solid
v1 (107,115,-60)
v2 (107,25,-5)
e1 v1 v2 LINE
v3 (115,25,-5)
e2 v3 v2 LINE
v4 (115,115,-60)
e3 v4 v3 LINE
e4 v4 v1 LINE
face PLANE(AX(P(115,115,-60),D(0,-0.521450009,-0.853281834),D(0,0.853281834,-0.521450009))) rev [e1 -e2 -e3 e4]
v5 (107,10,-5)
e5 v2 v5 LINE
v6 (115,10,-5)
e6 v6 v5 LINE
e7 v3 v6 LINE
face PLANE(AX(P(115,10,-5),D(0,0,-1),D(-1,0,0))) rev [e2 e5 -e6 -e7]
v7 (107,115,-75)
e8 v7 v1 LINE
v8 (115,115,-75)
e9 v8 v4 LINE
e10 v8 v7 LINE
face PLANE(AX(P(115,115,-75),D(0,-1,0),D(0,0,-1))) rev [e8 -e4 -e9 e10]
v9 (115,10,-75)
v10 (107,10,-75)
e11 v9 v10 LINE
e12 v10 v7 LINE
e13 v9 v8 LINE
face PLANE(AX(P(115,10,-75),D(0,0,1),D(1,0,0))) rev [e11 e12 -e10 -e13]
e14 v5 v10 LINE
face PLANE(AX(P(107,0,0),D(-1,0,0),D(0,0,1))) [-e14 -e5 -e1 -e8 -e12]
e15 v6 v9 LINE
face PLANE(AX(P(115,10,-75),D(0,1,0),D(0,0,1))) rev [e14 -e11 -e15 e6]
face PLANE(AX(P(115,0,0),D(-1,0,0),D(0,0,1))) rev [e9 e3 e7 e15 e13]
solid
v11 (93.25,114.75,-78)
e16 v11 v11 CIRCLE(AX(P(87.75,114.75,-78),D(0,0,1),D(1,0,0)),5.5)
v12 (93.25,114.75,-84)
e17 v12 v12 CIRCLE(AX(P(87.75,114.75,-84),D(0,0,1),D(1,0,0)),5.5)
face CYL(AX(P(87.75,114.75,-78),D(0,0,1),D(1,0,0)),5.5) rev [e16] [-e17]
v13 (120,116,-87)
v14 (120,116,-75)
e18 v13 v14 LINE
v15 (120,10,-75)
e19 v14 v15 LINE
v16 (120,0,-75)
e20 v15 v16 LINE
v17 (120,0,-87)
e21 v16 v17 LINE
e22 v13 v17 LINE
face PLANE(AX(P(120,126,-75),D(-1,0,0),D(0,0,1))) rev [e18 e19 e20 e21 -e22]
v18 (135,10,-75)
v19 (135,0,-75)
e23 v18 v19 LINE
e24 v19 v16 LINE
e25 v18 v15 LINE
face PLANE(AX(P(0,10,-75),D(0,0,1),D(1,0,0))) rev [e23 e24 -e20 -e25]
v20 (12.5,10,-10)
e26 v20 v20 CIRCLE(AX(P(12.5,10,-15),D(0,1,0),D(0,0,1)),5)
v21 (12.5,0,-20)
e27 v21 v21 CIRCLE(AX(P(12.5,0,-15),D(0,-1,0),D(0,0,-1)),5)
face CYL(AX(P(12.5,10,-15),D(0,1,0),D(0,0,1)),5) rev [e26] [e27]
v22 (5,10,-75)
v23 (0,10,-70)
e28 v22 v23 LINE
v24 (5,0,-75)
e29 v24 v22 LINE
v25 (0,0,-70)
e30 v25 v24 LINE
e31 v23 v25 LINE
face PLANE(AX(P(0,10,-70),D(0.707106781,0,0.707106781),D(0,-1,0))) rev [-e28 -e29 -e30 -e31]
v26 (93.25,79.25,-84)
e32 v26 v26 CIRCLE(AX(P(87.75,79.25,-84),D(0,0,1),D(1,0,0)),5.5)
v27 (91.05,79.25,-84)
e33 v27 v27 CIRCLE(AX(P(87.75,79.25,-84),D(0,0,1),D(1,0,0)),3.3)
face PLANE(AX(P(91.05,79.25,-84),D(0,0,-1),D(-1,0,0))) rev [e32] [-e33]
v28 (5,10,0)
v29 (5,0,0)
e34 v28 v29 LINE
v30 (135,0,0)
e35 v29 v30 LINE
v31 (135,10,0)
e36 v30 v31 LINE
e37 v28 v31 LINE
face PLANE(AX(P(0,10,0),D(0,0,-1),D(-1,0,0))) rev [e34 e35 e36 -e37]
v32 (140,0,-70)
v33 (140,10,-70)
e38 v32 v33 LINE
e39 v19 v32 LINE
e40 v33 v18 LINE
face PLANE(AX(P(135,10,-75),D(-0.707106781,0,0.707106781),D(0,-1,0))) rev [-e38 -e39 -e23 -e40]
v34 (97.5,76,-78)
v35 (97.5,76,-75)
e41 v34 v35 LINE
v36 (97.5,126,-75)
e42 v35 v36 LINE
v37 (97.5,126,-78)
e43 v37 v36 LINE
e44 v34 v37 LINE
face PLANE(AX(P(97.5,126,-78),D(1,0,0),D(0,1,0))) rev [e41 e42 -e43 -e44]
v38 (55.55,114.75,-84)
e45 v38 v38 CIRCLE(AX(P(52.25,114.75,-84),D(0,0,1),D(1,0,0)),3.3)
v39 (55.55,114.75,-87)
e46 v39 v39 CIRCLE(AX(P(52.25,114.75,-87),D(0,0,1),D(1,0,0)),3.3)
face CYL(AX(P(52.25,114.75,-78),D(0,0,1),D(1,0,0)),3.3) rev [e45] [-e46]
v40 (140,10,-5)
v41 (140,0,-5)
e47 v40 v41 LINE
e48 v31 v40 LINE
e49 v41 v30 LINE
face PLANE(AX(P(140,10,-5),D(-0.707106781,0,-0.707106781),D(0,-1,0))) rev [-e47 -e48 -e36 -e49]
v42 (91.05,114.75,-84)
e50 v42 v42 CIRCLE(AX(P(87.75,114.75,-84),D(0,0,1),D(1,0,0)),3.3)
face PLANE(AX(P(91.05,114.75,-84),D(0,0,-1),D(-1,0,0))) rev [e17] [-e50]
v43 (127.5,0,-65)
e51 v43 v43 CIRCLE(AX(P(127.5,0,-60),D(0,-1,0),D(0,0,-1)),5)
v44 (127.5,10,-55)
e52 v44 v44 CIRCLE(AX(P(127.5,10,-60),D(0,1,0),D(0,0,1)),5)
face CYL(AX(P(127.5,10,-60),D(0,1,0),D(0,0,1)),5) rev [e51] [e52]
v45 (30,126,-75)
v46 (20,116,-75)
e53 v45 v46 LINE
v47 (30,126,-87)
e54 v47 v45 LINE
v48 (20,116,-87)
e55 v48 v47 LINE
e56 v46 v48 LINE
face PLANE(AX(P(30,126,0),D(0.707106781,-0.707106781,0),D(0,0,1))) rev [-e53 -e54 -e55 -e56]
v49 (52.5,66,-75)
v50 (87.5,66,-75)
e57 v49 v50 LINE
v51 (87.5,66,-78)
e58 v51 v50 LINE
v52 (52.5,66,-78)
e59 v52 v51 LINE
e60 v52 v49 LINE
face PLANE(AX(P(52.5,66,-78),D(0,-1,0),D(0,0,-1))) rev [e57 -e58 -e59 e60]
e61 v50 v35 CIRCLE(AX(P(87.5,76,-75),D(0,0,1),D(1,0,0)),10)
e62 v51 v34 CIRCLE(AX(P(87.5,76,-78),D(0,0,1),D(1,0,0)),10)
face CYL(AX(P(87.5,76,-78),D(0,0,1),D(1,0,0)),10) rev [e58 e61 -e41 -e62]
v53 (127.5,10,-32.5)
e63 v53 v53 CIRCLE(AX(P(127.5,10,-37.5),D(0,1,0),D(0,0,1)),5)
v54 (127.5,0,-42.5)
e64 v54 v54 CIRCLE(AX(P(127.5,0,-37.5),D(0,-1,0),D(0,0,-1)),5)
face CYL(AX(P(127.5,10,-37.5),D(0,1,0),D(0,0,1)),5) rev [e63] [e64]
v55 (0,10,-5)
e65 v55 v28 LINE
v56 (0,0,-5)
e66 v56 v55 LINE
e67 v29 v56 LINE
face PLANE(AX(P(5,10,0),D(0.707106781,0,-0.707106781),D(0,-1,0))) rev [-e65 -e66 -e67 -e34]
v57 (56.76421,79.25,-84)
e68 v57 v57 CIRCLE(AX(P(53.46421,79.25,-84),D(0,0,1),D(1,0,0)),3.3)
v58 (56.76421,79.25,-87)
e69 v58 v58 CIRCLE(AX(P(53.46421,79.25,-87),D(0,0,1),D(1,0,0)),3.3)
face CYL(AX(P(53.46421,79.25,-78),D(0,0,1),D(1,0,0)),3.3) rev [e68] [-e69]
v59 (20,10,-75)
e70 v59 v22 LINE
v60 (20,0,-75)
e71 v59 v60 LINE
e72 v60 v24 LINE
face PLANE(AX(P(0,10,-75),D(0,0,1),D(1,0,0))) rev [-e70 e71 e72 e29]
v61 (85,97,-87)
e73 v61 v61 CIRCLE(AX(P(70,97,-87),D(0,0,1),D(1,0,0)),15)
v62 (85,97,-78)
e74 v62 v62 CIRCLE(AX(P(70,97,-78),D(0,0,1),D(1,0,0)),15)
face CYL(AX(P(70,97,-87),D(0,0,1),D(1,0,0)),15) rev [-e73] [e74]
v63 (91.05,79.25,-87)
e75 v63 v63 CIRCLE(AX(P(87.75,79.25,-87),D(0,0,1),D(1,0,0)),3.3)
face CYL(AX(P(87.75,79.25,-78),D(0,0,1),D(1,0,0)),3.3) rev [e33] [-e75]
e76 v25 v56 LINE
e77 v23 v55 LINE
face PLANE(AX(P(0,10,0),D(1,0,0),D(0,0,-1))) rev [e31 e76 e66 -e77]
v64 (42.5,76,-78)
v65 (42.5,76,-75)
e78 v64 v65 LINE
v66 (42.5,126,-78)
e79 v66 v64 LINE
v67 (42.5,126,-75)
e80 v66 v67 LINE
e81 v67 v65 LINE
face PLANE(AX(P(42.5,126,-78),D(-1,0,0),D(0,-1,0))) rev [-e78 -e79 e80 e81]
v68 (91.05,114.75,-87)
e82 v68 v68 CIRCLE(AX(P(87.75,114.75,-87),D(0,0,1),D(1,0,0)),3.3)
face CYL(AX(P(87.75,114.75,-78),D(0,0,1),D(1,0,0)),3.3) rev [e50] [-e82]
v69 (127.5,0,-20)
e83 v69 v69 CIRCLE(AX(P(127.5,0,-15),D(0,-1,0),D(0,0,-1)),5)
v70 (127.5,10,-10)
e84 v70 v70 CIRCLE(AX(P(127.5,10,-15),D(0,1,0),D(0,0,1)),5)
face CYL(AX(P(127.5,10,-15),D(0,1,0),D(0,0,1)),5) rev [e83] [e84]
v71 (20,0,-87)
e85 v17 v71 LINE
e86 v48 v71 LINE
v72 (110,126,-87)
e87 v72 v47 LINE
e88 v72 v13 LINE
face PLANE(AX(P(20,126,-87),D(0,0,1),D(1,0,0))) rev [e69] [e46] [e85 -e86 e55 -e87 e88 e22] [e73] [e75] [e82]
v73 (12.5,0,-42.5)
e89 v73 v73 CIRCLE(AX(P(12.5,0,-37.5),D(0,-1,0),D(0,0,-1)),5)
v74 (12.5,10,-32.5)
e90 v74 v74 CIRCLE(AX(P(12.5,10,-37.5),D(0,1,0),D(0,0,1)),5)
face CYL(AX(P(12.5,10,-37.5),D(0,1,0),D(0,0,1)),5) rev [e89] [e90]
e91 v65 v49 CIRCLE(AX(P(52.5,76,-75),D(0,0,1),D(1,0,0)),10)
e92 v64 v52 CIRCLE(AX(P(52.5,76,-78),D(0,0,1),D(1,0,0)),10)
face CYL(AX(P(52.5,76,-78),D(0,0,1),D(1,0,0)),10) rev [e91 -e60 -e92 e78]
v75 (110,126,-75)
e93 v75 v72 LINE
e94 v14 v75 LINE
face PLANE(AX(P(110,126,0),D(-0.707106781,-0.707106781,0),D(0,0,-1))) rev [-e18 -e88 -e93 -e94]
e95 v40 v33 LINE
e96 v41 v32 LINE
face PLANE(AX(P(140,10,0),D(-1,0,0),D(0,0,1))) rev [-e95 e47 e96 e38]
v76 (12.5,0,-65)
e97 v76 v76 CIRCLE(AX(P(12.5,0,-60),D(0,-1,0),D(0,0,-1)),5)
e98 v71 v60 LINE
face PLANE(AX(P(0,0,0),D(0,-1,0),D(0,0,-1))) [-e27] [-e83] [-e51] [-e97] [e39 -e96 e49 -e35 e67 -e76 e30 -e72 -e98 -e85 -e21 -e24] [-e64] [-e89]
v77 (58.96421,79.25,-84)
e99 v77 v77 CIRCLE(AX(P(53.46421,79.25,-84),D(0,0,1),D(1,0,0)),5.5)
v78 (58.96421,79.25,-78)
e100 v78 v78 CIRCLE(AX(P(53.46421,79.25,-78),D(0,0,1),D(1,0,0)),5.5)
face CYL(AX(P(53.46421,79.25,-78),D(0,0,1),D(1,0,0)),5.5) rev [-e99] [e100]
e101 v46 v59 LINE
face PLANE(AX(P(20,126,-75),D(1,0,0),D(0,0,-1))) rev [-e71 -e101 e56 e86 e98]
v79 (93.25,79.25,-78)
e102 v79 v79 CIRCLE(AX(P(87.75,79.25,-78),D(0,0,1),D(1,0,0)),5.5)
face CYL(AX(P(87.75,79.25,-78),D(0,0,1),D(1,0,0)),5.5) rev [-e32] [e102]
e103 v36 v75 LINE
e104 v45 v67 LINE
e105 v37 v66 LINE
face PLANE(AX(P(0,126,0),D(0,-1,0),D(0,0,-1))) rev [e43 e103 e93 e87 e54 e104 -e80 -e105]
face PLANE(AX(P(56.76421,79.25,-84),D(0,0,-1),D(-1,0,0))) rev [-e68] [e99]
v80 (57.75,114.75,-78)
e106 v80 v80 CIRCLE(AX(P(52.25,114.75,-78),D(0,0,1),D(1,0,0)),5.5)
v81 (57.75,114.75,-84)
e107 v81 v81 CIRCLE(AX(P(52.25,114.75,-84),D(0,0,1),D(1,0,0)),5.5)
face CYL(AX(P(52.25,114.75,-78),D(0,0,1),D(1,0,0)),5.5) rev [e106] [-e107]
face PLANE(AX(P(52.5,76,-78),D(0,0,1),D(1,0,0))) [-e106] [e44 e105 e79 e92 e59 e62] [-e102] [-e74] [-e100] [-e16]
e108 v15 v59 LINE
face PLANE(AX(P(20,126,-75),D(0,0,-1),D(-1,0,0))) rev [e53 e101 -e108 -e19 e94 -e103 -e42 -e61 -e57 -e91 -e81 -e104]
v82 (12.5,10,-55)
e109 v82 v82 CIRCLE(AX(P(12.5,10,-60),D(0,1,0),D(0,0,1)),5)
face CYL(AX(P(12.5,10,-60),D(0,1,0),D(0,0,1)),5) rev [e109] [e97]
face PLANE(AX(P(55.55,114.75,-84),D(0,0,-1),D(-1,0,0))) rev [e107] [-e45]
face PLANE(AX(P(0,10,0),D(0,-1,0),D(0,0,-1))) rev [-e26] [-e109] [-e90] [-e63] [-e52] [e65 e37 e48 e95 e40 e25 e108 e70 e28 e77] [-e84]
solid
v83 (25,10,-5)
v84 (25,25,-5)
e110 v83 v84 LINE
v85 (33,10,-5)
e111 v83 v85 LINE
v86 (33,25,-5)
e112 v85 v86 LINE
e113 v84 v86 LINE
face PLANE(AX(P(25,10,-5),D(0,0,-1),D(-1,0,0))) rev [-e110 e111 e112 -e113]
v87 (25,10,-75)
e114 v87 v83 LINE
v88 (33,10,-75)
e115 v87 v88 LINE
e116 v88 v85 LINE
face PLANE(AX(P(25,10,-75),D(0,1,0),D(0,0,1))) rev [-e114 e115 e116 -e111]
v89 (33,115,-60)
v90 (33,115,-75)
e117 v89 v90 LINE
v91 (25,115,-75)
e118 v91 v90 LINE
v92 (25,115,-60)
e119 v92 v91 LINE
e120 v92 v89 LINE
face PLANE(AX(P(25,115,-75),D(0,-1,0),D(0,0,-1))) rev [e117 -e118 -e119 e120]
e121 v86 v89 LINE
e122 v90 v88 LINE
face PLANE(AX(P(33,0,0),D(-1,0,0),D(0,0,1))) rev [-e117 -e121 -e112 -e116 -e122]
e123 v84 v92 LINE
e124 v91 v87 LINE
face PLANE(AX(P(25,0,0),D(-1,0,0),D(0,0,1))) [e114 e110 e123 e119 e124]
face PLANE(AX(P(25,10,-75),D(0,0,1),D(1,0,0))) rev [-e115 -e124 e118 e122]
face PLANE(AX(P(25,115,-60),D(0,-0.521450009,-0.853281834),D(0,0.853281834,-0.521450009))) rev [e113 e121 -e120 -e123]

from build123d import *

# Parameters (mm, degrees)
SKETCH1_W                                    = 140
SKETCH1_H                                    = 75
BOSS_EXTRUDE1_DEPTH                          = 10
SKETCH2_W                                    = 100
SKETCH2_H                                    = 12
BOSS_EXTRUDE2_DEPTH                          = 126
GUSSET1_START                                = 25
GUSSET1_DEPTH                                = 8
GUSSET2_START                                = 107
GUSSET2_DEPTH                                = 8
F_10_0MM_DOWEL_HOLE1_AT_2_COUNT              = 2
F_10_0MM_DOWEL_HOLE1_AT_2_PITCH              = 115
F_10_0MM_DOWEL_HOLE2_AT_2_COUNT              = 2
F_10_0MM_DOWEL_HOLE2_AT_2_PITCH              = 45
F_10_0MM_DOWEL_HOLE2_AT_3_COUNT              = 2
F_10_0MM_DOWEL_HOLE2_AT_3_PITCH              = 115
F_10_0MM_DOWEL_HOLE2_AT_4_COUNT              = 2
F_10_0MM_DOWEL_HOLE2_AT_4_PITCH              = 123.490890352
CUT_EXTRUDE1_DEPTH                           = 3
SKETCH15_R                                   = 15
CUT_EXTRUDE2_DEPTH                           = 204.862698893
CBORE_FOR_M5_HEX_SOCKET_HEAD_CAP_SCR_2_COUNT = 2
CBORE_FOR_M5_HEX_SOCKET_HEAD_CAP_SCR_2_PITCH = 35.5
CBORE_FOR_M5_HEX_SOCKET_HEAD_CAP_SCR_3_COUNT = 2
CBORE_FOR_M5_HEX_SOCKET_HEAD_CAP_SCR_3_PITCH = 50.204581464
CBORE_FOR_M5_HEX_SOCKET_HEAD_CAP_SCR_4_COUNT = 2
CBORE_FOR_M5_HEX_SOCKET_HEAD_CAP_SCR_4_PITCH = 35.520758797
CHAMFER1_SIZE                                = 5
CHAMFER2_SIZE                                = 10


# Read off the part's stored shape, not the designer's step: Gusset1, Gusset2
with BuildPart() as part:
    # Sketch1 → Boss-Extrude1 (new body)
    with BuildSketch(Plane(origin=(0, 0, 0), x_dir=(1, 0, 0), z_dir=(0, 1, 0))):
        with Locations((70, 37.5)):
            Rectangle(SKETCH1_W, SKETCH1_H)
    extrude(amount=BOSS_EXTRUDE1_DEPTH)

    # Sketch2 → Boss-Extrude2 (add)
    with BuildSketch(Plane(origin=(0, 0, 0), x_dir=(1, 0, 0), z_dir=(0, 1, 0))):
        with Locations((70, 81)):
            Rectangle(SKETCH2_W, SKETCH2_H)
    extrude(amount=BOSS_EXTRUDE2_DEPTH)

    # Sketch7 → Ø10.0mm Dowel Hole1 (revolve, cut)
    with BuildSketch(Plane(origin=(12.5, 10, -37.5), x_dir=(0, 0, 1), z_dir=(1, 0, 0))):
        Polygon((0, 0), (0, 19.004303095), (5, 16), (5, 0), align=None)
    f_10_0mm_dowel_hole1 = revolve(axis=Axis((12.5, 16.35, -37.5), (0, -1, 0)), mode=Mode.SUBTRACT)

    # Ø10.0mm Dowel Hole1 at 2: Ø10.0mm Dowel Hole1 ×2
    with Locations(*[(i * F_10_0MM_DOWEL_HOLE1_AT_2_PITCH, 0, 0) for i in range(1, F_10_0MM_DOWEL_HOLE1_AT_2_COUNT)]):
        add(f_10_0mm_dowel_hole1, mode=Mode.SUBTRACT)

    # Sketch13 → Ø10.0mm Dowel Hole2 (revolve, cut)
    with BuildSketch(Plane(origin=(12.5, 10, -60), x_dir=(0, 0, 1), z_dir=(1, 0, 0))):
        Polygon((0, 0), (0, 32.254303095), (5, 29.25), (5, 0), align=None)
    f_10_0mm_dowel_hole2 = revolve(axis=Axis((12.5, 16.35, -60), (0, -1, 0)), mode=Mode.SUBTRACT)

    # Ø10.0mm Dowel Hole2 at 2: Ø10.0mm Dowel Hole2 ×2
    with Locations(*[(0, 0, i * F_10_0MM_DOWEL_HOLE2_AT_2_PITCH) for i in range(1, F_10_0MM_DOWEL_HOLE2_AT_2_COUNT)]):
        add(f_10_0mm_dowel_hole2, mode=Mode.SUBTRACT)

    # Ø10.0mm Dowel Hole2 at 3: Ø10.0mm Dowel Hole2 ×2
    with Locations(*[(i * F_10_0MM_DOWEL_HOLE2_AT_3_PITCH, 0, 0) for i in range(1, F_10_0MM_DOWEL_HOLE2_AT_3_COUNT)]):
        add(f_10_0mm_dowel_hole2, mode=Mode.SUBTRACT)

    # Ø10.0mm Dowel Hole2 at 4: Ø10.0mm Dowel Hole2 ×2
    with Locations(*[Vector(0.9312427797057534, 0, 0.3643993485805122) * (i * F_10_0MM_DOWEL_HOLE2_AT_4_PITCH) for i in range(1, F_10_0MM_DOWEL_HOLE2_AT_4_COUNT)]):
        add(f_10_0mm_dowel_hole2, mode=Mode.SUBTRACT)

    # Sketch14 → Cut-Extrude1 (cut)
    with BuildSketch(Plane.XY.offset(-75)):
        with BuildLine():
            Line((42.5, 126), (97.5, 126))
            Line((97.5, 126), (97.5, 76))
            ThreePointArc((97.5, 76), (94.571067812, 68.928932188), (87.5, 66))
            Line((87.5, 66), (52.5, 66))
            ThreePointArc((52.5, 66), (45.428932188, 68.928932188), (42.5, 76))
            Line((42.5, 76), (42.5, 126))
        make_face()
    extrude(amount=-CUT_EXTRUDE1_DEPTH, mode=Mode.SUBTRACT)

    # Sketch15 → Cut-Extrude2 (cut, through all)
    with BuildSketch(Plane.XY.offset(-78)):
        with Locations((70, 97)):
            Circle(SKETCH15_R)
    extrude(amount=-CUT_EXTRUDE2_DEPTH, mode=Mode.SUBTRACT)

    # Sketch20 → CBORE for M5 Hex Socket Head Cap Screw1 (revolve, cut)
    with BuildSketch(Plane(origin=(52.25, 114.75, -78), x_dir=(0, -1, 0), z_dir=(1, 0, 0))):
        Polygon((0, 0), (0, 9), (3.3, 9), (3.3, 6), (5.5, 6), (5.5, 0), align=None)
    cbore_for_m5_hex_socket_head_cap_screw1 = revolve(axis=Axis((52.25, 114.75, -71.65), (0, 0, -1)), mode=Mode.SUBTRACT)

    # CBORE for M5 Hex Socket Head Cap Scr 2: CBORE for M5 Hex Socket Head Cap Screw1 ×2
    with Locations(*[(i * CBORE_FOR_M5_HEX_SOCKET_HEAD_CAP_SCR_2_PITCH, 0, 0) for i in range(1, CBORE_FOR_M5_HEX_SOCKET_HEAD_CAP_SCR_2_COUNT)]):
        add(cbore_for_m5_hex_socket_head_cap_screw1, mode=Mode.SUBTRACT)

    # CBORE for M5 Hex Socket Head Cap Scr 3: CBORE for M5 Hex Socket Head Cap Screw1 ×2
    with Locations(*[Vector(0.7071067811865476, -0.7071067811865475, 0) * (i * CBORE_FOR_M5_HEX_SOCKET_HEAD_CAP_SCR_3_PITCH) for i in range(1, CBORE_FOR_M5_HEX_SOCKET_HEAD_CAP_SCR_3_COUNT)]):
        add(cbore_for_m5_hex_socket_head_cap_screw1, mode=Mode.SUBTRACT)

    # CBORE for M5 Hex Socket Head Cap Scr 4: CBORE for M5 Hex Socket Head Cap Screw1 ×2
    with Locations(*[Vector(0.034183104868825386, -0.9994155869014286, 0) * (i * CBORE_FOR_M5_HEX_SOCKET_HEAD_CAP_SCR_4_PITCH) for i in range(1, CBORE_FOR_M5_HEX_SOCKET_HEAD_CAP_SCR_4_COUNT)]):
        add(cbore_for_m5_hex_socket_head_cap_screw1, mode=Mode.SUBTRACT)

    # Chamfer1
    chamfer1_edges = [part.edges().sort_by_distance(p)[0] for p in [
        (0, 5, -75),
        (140, 5, -75),
        (140, 5, 0),
        (0, 5, 0),
    ]]
    chamfer(chamfer1_edges, length=CHAMFER1_SIZE)

    # Chamfer2
    chamfer2_edges = [part.edges().sort_by_distance(p)[0] for p in [
        (20, 126, -81),
        (120, 126, -81),
    ]]
    chamfer(chamfer2_edges, length=CHAMFER2_SIZE)


with BuildPart() as body_2:
    # Gusset1 outline → Gusset1 (new body)
    with BuildSketch(Plane.YZ.offset(GUSSET1_START)):
        Polygon((115, -75), (115, -60), (25, -5), (10, -5), (10, -75), align=None)
    extrude(amount=GUSSET1_DEPTH)


with BuildPart() as body_3:
    # Gusset2 outline → Gusset2 (new body)
    with BuildSketch(Plane.YZ.offset(GUSSET2_START)):
        Polygon((115, -75), (115, -60), (25, -5), (10, -5), (10, -75), align=None)
    extrude(amount=GUSSET2_DEPTH)


solid = Compound([part.part, body_2.part, body_3.part])
